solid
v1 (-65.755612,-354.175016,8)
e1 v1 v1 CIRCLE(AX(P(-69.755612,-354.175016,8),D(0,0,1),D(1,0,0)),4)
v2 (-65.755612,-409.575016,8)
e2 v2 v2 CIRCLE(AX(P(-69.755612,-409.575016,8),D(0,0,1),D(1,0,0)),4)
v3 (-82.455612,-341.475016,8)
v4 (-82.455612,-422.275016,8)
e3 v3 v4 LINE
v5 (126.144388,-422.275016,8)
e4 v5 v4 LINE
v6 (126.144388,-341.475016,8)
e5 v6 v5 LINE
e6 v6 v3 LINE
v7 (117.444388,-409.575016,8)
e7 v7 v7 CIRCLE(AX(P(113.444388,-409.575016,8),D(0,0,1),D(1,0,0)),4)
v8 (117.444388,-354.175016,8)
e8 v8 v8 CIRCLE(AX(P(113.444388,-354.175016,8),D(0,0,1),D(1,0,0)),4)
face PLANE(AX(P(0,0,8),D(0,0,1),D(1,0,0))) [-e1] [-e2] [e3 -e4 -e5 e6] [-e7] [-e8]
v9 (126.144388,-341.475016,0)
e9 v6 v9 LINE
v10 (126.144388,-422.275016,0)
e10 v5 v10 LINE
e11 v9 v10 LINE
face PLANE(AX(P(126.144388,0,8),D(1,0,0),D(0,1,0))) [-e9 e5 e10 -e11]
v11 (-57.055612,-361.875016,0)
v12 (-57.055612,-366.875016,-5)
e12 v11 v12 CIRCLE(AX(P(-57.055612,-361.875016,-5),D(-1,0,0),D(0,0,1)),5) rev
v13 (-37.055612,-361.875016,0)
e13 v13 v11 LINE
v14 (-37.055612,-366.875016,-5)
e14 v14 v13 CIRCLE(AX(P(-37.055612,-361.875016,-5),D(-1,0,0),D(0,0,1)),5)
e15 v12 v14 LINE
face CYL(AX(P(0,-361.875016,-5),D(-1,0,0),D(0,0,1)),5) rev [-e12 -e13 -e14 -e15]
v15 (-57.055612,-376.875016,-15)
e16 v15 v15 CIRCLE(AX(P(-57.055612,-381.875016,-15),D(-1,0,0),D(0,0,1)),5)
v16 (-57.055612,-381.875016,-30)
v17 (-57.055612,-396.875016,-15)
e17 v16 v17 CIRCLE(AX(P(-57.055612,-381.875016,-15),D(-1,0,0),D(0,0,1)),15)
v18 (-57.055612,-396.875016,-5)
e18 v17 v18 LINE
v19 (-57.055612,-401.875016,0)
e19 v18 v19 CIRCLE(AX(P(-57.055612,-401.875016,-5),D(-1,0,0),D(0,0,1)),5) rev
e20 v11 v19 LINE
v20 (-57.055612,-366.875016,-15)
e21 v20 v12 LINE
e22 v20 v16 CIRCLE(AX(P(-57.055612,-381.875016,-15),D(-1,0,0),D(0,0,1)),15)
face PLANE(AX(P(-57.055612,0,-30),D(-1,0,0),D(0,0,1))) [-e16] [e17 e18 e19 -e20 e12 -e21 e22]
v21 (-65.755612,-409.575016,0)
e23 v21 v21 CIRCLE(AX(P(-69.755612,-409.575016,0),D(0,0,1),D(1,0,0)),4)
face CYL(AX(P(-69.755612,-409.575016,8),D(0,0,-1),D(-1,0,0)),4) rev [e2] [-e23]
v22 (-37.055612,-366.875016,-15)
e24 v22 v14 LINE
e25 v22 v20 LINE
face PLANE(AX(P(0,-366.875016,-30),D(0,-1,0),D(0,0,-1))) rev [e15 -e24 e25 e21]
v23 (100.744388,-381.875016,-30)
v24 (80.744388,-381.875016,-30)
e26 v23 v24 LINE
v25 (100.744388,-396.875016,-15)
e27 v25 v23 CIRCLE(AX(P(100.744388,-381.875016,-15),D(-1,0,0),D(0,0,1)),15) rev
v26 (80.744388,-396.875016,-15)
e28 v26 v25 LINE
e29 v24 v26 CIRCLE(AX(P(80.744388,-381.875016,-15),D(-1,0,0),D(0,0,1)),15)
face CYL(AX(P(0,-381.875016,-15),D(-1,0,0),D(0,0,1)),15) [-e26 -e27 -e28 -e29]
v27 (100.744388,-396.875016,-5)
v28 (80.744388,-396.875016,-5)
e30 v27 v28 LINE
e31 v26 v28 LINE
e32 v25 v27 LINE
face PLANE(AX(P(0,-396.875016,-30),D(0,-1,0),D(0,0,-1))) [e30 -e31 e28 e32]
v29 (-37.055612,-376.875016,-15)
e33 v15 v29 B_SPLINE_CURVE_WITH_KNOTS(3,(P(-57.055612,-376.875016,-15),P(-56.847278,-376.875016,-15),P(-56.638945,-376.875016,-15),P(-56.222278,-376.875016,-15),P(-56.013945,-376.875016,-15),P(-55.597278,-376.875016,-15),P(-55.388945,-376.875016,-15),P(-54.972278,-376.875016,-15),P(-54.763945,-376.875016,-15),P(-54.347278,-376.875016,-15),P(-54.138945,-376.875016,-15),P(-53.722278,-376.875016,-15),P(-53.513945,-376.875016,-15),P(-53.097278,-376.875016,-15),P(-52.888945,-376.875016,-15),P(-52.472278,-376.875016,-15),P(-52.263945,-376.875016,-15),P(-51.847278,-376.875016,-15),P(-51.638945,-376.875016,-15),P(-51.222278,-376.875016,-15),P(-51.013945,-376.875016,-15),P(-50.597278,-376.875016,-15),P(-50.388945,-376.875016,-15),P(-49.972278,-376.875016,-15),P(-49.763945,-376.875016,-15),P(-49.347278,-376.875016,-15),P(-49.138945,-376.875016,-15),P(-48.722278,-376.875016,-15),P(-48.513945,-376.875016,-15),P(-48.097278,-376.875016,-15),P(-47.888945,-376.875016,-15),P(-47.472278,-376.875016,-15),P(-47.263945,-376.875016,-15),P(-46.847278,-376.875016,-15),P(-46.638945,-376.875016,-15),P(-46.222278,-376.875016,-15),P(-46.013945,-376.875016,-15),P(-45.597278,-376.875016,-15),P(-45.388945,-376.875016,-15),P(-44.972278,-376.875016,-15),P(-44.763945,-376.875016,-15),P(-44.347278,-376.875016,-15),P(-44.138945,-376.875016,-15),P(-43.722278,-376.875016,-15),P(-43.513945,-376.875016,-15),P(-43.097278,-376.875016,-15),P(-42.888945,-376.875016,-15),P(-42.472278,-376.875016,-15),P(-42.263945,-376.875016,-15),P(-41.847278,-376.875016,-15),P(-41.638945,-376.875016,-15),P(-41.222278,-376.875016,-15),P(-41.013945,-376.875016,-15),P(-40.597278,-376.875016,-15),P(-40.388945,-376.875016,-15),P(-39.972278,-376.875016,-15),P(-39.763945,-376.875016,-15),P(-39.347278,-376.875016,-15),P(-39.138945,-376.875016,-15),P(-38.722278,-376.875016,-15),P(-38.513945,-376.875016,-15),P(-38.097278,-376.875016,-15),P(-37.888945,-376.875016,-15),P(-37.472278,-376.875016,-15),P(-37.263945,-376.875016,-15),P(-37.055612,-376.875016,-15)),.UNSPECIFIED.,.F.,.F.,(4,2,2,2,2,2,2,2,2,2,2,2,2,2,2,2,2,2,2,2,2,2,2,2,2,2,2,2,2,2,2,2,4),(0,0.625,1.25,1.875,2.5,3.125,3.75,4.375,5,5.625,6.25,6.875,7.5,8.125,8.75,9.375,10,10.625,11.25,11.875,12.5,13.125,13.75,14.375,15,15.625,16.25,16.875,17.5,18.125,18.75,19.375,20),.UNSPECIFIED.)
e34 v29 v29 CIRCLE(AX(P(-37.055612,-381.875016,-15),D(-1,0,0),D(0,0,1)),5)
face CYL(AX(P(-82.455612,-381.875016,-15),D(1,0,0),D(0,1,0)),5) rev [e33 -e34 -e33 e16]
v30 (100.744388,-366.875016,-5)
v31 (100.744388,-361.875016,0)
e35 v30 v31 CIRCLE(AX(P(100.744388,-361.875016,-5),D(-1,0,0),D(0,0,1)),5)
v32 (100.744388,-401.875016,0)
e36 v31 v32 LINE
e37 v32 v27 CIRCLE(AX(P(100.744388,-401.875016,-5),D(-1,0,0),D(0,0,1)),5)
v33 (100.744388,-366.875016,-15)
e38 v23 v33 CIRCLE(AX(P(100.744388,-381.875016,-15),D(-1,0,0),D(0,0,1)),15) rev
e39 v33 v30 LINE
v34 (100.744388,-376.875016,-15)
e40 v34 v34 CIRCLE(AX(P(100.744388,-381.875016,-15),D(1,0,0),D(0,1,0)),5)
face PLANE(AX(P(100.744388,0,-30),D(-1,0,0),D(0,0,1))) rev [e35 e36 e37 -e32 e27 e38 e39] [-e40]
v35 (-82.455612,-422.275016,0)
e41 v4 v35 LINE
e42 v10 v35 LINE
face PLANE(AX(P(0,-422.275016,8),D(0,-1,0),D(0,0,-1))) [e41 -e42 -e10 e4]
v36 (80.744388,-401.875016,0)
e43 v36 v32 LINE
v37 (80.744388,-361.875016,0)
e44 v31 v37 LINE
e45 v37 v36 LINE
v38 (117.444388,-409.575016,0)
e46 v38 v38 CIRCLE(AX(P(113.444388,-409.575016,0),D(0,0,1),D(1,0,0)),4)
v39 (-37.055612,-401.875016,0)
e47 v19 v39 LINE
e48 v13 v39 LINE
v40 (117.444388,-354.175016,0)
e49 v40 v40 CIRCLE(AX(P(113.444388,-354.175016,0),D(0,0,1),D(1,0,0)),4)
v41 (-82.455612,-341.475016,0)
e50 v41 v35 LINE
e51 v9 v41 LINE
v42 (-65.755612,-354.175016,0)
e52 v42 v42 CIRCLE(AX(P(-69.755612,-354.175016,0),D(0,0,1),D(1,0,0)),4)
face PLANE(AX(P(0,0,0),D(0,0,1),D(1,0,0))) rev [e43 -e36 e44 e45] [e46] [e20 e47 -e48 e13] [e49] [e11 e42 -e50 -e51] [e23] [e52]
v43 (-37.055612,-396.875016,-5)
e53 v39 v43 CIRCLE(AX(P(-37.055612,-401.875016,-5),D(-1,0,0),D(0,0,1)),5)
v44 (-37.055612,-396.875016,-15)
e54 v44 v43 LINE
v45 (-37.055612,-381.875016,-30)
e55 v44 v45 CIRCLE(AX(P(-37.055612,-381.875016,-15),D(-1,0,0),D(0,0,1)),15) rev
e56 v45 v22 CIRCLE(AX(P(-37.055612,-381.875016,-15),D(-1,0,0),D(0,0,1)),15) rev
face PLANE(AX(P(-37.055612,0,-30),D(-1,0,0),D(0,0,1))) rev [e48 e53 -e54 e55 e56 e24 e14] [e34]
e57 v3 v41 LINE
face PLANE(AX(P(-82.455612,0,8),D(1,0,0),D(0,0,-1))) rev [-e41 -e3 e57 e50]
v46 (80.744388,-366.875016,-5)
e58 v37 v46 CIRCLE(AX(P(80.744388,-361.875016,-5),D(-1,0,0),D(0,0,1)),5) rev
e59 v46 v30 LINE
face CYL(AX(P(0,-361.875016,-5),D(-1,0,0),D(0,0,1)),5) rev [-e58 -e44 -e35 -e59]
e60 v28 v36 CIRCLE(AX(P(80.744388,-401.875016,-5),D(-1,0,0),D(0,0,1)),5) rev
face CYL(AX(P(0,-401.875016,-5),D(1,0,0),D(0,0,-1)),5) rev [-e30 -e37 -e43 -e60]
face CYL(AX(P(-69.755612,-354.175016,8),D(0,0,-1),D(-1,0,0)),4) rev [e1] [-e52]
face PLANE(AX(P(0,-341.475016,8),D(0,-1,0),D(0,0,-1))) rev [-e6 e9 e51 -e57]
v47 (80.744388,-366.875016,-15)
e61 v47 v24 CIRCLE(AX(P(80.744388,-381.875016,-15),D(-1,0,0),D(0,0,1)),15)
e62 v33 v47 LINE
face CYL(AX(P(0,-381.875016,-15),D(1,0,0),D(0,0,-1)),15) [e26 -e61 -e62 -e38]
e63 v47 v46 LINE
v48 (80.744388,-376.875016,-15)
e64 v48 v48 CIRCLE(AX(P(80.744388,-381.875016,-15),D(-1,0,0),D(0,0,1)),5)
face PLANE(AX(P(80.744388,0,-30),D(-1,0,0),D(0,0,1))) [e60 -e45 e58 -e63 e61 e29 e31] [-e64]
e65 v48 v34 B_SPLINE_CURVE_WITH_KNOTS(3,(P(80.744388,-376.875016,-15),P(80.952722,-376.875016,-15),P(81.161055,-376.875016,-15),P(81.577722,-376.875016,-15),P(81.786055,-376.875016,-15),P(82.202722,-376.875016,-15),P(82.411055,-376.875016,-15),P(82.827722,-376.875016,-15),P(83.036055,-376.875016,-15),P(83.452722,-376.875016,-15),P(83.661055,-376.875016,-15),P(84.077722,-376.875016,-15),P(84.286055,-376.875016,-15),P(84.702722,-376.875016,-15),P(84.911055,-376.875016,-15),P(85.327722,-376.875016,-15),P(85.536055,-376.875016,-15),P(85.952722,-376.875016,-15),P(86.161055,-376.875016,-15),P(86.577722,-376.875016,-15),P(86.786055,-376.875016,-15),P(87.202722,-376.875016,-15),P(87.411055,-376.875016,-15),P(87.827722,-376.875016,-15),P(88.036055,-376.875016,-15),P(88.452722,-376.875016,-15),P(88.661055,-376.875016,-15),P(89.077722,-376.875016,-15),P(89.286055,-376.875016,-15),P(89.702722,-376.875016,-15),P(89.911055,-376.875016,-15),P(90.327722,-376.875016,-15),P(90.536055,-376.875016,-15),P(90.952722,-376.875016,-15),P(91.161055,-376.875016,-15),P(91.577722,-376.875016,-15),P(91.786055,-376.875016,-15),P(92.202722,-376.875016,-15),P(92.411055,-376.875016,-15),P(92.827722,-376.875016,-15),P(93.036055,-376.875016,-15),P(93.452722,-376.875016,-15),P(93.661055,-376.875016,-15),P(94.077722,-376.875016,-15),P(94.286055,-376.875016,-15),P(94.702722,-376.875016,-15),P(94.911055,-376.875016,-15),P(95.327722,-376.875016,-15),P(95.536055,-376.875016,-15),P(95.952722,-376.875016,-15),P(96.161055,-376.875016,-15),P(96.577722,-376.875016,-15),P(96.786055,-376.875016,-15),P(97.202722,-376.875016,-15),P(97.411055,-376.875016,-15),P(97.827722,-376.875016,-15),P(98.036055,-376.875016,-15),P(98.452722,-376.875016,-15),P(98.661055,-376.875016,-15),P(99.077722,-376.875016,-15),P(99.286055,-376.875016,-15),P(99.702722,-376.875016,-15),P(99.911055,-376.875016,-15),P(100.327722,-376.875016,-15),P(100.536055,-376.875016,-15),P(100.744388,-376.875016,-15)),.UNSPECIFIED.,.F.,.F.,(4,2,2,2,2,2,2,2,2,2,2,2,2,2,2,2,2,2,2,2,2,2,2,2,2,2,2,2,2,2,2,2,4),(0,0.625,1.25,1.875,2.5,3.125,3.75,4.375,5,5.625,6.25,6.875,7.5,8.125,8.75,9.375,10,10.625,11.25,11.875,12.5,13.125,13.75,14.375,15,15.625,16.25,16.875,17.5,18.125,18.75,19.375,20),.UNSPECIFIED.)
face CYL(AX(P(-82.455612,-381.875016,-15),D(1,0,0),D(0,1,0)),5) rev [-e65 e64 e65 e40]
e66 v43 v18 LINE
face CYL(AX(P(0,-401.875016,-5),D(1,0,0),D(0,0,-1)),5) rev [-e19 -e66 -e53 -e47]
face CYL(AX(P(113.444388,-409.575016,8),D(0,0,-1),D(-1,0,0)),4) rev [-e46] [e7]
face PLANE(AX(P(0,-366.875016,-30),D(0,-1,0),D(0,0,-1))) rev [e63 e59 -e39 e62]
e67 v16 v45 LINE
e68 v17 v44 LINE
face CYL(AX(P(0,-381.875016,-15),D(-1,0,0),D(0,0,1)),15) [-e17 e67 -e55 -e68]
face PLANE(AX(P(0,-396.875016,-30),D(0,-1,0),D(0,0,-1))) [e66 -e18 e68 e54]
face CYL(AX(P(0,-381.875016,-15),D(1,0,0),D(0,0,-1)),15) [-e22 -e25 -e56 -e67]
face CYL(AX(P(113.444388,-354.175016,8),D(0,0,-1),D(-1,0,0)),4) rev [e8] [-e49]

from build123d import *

# Parameters (mm, degrees)
SKETCH1_W           = 208.6
SKETCH1_H           = 80.8
SKETCH1_R           = 4
SKETCH1_W_2         = 20
SKETCH1_H_2         = 30
BOSS_EXTRUDE1_DEPTH = 8
SKETCH1_3_W         = 20
SKETCH1_3_H         = 30
BOSS_EXTRUDE2_DEPTH = 30
FILLET1_R           = 5
FILLET2_R           = 15
SKETCH2_R           = 5
CUT_EXTRUDE1_DEPTH  = 462.279122908


with BuildPart() as part:
    # Sketch1 → Boss-Extrude1 (new body)
    # profile 1 of 3: a face of its own
    with BuildSketch(Plane.XY):
        with Locations((21.844388387, -381.87501611)):
            Rectangle(SKETCH1_W, SKETCH1_H)
        with Locations((113.444388387, -409.57501611)):
            Circle(SKETCH1_R, mode=Mode.SUBTRACT)
        with Locations((-69.755611613, -354.17501611)):
            Circle(SKETCH1_R, mode=Mode.SUBTRACT)
        with Locations((-69.755611613, -409.57501611)):
            Circle(SKETCH1_R, mode=Mode.SUBTRACT)
        with Locations((113.444388387, -354.17501611)):
            Circle(SKETCH1_R, mode=Mode.SUBTRACT)
        with Locations((90.744388387, -381.87501611)):
            Rectangle(SKETCH1_W_2, SKETCH1_H_2, mode=Mode.SUBTRACT)
        with Locations((-47.055611613, -381.87501611)):
            Rectangle(SKETCH1_W_2, SKETCH1_H_2, mode=Mode.SUBTRACT)
    # profile 2 of 3: a face of its own
    with BuildSketch(Plane.XY):
        with Locations((-47.055611613, -381.87501611)):
            Rectangle(SKETCH1_W_2, SKETCH1_H_2)
    # profile 3 of 3: a face of its own
    with BuildSketch(Plane.XY):
        with Locations((90.744388387, -381.87501611)):
            Rectangle(SKETCH1_W_2, SKETCH1_H_2)
    extrude(amount=BOSS_EXTRUDE1_DEPTH)

    # Sketch1<3> → Boss-Extrude2 (add)
    with BuildSketch(Plane.XY):
        with Locations((90.744388387, -381.87501611)):
            Rectangle(SKETCH1_3_W, SKETCH1_3_H)
        with Locations((-47.055611613, -381.87501611)):
            Rectangle(SKETCH1_3_W, SKETCH1_3_H)
    extrude(amount=-BOSS_EXTRUDE2_DEPTH)

    # Fillet1
    fillet1_edges = [part.edges().sort_by_distance(p)[0] for p in [
        (90.744388387, -366.87501611, 0),
        (90.744388387, -396.87501611, 0),
        (-47.055611613, -366.87501611, 0),
        (-47.055611613, -396.87501611, 0),
    ]]
    fillet(fillet1_edges, radius=FILLET1_R)

    # Fillet2
    fillet2_edges = [part.edges().sort_by_distance(p)[0] for p in [
        (90.744388387, -366.87501611, -30),
        (90.744388387, -396.87501611, -30),
        (-47.055611613, -396.87501611, -30),
        (-47.055611613, -366.87501611, -30),
    ]]
    fillet(fillet2_edges, radius=FILLET2_R - 0.0001)  # a hair under: the kernel refuses the full size

    # Sketch2 → Cut-Extrude1 (cut, through all)
    with BuildSketch(Plane(origin=(100.744388387, 0, 0), x_dir=(0, 0, -1), z_dir=(1, 0, 0))):
        with Locations(Location((15, -381.87501611, 0), (0, 0, 90))):
            Circle(SKETCH2_R)
    extrude(amount=-CUT_EXTRUDE1_DEPTH, mode=Mode.SUBTRACT)


solid = part.part
